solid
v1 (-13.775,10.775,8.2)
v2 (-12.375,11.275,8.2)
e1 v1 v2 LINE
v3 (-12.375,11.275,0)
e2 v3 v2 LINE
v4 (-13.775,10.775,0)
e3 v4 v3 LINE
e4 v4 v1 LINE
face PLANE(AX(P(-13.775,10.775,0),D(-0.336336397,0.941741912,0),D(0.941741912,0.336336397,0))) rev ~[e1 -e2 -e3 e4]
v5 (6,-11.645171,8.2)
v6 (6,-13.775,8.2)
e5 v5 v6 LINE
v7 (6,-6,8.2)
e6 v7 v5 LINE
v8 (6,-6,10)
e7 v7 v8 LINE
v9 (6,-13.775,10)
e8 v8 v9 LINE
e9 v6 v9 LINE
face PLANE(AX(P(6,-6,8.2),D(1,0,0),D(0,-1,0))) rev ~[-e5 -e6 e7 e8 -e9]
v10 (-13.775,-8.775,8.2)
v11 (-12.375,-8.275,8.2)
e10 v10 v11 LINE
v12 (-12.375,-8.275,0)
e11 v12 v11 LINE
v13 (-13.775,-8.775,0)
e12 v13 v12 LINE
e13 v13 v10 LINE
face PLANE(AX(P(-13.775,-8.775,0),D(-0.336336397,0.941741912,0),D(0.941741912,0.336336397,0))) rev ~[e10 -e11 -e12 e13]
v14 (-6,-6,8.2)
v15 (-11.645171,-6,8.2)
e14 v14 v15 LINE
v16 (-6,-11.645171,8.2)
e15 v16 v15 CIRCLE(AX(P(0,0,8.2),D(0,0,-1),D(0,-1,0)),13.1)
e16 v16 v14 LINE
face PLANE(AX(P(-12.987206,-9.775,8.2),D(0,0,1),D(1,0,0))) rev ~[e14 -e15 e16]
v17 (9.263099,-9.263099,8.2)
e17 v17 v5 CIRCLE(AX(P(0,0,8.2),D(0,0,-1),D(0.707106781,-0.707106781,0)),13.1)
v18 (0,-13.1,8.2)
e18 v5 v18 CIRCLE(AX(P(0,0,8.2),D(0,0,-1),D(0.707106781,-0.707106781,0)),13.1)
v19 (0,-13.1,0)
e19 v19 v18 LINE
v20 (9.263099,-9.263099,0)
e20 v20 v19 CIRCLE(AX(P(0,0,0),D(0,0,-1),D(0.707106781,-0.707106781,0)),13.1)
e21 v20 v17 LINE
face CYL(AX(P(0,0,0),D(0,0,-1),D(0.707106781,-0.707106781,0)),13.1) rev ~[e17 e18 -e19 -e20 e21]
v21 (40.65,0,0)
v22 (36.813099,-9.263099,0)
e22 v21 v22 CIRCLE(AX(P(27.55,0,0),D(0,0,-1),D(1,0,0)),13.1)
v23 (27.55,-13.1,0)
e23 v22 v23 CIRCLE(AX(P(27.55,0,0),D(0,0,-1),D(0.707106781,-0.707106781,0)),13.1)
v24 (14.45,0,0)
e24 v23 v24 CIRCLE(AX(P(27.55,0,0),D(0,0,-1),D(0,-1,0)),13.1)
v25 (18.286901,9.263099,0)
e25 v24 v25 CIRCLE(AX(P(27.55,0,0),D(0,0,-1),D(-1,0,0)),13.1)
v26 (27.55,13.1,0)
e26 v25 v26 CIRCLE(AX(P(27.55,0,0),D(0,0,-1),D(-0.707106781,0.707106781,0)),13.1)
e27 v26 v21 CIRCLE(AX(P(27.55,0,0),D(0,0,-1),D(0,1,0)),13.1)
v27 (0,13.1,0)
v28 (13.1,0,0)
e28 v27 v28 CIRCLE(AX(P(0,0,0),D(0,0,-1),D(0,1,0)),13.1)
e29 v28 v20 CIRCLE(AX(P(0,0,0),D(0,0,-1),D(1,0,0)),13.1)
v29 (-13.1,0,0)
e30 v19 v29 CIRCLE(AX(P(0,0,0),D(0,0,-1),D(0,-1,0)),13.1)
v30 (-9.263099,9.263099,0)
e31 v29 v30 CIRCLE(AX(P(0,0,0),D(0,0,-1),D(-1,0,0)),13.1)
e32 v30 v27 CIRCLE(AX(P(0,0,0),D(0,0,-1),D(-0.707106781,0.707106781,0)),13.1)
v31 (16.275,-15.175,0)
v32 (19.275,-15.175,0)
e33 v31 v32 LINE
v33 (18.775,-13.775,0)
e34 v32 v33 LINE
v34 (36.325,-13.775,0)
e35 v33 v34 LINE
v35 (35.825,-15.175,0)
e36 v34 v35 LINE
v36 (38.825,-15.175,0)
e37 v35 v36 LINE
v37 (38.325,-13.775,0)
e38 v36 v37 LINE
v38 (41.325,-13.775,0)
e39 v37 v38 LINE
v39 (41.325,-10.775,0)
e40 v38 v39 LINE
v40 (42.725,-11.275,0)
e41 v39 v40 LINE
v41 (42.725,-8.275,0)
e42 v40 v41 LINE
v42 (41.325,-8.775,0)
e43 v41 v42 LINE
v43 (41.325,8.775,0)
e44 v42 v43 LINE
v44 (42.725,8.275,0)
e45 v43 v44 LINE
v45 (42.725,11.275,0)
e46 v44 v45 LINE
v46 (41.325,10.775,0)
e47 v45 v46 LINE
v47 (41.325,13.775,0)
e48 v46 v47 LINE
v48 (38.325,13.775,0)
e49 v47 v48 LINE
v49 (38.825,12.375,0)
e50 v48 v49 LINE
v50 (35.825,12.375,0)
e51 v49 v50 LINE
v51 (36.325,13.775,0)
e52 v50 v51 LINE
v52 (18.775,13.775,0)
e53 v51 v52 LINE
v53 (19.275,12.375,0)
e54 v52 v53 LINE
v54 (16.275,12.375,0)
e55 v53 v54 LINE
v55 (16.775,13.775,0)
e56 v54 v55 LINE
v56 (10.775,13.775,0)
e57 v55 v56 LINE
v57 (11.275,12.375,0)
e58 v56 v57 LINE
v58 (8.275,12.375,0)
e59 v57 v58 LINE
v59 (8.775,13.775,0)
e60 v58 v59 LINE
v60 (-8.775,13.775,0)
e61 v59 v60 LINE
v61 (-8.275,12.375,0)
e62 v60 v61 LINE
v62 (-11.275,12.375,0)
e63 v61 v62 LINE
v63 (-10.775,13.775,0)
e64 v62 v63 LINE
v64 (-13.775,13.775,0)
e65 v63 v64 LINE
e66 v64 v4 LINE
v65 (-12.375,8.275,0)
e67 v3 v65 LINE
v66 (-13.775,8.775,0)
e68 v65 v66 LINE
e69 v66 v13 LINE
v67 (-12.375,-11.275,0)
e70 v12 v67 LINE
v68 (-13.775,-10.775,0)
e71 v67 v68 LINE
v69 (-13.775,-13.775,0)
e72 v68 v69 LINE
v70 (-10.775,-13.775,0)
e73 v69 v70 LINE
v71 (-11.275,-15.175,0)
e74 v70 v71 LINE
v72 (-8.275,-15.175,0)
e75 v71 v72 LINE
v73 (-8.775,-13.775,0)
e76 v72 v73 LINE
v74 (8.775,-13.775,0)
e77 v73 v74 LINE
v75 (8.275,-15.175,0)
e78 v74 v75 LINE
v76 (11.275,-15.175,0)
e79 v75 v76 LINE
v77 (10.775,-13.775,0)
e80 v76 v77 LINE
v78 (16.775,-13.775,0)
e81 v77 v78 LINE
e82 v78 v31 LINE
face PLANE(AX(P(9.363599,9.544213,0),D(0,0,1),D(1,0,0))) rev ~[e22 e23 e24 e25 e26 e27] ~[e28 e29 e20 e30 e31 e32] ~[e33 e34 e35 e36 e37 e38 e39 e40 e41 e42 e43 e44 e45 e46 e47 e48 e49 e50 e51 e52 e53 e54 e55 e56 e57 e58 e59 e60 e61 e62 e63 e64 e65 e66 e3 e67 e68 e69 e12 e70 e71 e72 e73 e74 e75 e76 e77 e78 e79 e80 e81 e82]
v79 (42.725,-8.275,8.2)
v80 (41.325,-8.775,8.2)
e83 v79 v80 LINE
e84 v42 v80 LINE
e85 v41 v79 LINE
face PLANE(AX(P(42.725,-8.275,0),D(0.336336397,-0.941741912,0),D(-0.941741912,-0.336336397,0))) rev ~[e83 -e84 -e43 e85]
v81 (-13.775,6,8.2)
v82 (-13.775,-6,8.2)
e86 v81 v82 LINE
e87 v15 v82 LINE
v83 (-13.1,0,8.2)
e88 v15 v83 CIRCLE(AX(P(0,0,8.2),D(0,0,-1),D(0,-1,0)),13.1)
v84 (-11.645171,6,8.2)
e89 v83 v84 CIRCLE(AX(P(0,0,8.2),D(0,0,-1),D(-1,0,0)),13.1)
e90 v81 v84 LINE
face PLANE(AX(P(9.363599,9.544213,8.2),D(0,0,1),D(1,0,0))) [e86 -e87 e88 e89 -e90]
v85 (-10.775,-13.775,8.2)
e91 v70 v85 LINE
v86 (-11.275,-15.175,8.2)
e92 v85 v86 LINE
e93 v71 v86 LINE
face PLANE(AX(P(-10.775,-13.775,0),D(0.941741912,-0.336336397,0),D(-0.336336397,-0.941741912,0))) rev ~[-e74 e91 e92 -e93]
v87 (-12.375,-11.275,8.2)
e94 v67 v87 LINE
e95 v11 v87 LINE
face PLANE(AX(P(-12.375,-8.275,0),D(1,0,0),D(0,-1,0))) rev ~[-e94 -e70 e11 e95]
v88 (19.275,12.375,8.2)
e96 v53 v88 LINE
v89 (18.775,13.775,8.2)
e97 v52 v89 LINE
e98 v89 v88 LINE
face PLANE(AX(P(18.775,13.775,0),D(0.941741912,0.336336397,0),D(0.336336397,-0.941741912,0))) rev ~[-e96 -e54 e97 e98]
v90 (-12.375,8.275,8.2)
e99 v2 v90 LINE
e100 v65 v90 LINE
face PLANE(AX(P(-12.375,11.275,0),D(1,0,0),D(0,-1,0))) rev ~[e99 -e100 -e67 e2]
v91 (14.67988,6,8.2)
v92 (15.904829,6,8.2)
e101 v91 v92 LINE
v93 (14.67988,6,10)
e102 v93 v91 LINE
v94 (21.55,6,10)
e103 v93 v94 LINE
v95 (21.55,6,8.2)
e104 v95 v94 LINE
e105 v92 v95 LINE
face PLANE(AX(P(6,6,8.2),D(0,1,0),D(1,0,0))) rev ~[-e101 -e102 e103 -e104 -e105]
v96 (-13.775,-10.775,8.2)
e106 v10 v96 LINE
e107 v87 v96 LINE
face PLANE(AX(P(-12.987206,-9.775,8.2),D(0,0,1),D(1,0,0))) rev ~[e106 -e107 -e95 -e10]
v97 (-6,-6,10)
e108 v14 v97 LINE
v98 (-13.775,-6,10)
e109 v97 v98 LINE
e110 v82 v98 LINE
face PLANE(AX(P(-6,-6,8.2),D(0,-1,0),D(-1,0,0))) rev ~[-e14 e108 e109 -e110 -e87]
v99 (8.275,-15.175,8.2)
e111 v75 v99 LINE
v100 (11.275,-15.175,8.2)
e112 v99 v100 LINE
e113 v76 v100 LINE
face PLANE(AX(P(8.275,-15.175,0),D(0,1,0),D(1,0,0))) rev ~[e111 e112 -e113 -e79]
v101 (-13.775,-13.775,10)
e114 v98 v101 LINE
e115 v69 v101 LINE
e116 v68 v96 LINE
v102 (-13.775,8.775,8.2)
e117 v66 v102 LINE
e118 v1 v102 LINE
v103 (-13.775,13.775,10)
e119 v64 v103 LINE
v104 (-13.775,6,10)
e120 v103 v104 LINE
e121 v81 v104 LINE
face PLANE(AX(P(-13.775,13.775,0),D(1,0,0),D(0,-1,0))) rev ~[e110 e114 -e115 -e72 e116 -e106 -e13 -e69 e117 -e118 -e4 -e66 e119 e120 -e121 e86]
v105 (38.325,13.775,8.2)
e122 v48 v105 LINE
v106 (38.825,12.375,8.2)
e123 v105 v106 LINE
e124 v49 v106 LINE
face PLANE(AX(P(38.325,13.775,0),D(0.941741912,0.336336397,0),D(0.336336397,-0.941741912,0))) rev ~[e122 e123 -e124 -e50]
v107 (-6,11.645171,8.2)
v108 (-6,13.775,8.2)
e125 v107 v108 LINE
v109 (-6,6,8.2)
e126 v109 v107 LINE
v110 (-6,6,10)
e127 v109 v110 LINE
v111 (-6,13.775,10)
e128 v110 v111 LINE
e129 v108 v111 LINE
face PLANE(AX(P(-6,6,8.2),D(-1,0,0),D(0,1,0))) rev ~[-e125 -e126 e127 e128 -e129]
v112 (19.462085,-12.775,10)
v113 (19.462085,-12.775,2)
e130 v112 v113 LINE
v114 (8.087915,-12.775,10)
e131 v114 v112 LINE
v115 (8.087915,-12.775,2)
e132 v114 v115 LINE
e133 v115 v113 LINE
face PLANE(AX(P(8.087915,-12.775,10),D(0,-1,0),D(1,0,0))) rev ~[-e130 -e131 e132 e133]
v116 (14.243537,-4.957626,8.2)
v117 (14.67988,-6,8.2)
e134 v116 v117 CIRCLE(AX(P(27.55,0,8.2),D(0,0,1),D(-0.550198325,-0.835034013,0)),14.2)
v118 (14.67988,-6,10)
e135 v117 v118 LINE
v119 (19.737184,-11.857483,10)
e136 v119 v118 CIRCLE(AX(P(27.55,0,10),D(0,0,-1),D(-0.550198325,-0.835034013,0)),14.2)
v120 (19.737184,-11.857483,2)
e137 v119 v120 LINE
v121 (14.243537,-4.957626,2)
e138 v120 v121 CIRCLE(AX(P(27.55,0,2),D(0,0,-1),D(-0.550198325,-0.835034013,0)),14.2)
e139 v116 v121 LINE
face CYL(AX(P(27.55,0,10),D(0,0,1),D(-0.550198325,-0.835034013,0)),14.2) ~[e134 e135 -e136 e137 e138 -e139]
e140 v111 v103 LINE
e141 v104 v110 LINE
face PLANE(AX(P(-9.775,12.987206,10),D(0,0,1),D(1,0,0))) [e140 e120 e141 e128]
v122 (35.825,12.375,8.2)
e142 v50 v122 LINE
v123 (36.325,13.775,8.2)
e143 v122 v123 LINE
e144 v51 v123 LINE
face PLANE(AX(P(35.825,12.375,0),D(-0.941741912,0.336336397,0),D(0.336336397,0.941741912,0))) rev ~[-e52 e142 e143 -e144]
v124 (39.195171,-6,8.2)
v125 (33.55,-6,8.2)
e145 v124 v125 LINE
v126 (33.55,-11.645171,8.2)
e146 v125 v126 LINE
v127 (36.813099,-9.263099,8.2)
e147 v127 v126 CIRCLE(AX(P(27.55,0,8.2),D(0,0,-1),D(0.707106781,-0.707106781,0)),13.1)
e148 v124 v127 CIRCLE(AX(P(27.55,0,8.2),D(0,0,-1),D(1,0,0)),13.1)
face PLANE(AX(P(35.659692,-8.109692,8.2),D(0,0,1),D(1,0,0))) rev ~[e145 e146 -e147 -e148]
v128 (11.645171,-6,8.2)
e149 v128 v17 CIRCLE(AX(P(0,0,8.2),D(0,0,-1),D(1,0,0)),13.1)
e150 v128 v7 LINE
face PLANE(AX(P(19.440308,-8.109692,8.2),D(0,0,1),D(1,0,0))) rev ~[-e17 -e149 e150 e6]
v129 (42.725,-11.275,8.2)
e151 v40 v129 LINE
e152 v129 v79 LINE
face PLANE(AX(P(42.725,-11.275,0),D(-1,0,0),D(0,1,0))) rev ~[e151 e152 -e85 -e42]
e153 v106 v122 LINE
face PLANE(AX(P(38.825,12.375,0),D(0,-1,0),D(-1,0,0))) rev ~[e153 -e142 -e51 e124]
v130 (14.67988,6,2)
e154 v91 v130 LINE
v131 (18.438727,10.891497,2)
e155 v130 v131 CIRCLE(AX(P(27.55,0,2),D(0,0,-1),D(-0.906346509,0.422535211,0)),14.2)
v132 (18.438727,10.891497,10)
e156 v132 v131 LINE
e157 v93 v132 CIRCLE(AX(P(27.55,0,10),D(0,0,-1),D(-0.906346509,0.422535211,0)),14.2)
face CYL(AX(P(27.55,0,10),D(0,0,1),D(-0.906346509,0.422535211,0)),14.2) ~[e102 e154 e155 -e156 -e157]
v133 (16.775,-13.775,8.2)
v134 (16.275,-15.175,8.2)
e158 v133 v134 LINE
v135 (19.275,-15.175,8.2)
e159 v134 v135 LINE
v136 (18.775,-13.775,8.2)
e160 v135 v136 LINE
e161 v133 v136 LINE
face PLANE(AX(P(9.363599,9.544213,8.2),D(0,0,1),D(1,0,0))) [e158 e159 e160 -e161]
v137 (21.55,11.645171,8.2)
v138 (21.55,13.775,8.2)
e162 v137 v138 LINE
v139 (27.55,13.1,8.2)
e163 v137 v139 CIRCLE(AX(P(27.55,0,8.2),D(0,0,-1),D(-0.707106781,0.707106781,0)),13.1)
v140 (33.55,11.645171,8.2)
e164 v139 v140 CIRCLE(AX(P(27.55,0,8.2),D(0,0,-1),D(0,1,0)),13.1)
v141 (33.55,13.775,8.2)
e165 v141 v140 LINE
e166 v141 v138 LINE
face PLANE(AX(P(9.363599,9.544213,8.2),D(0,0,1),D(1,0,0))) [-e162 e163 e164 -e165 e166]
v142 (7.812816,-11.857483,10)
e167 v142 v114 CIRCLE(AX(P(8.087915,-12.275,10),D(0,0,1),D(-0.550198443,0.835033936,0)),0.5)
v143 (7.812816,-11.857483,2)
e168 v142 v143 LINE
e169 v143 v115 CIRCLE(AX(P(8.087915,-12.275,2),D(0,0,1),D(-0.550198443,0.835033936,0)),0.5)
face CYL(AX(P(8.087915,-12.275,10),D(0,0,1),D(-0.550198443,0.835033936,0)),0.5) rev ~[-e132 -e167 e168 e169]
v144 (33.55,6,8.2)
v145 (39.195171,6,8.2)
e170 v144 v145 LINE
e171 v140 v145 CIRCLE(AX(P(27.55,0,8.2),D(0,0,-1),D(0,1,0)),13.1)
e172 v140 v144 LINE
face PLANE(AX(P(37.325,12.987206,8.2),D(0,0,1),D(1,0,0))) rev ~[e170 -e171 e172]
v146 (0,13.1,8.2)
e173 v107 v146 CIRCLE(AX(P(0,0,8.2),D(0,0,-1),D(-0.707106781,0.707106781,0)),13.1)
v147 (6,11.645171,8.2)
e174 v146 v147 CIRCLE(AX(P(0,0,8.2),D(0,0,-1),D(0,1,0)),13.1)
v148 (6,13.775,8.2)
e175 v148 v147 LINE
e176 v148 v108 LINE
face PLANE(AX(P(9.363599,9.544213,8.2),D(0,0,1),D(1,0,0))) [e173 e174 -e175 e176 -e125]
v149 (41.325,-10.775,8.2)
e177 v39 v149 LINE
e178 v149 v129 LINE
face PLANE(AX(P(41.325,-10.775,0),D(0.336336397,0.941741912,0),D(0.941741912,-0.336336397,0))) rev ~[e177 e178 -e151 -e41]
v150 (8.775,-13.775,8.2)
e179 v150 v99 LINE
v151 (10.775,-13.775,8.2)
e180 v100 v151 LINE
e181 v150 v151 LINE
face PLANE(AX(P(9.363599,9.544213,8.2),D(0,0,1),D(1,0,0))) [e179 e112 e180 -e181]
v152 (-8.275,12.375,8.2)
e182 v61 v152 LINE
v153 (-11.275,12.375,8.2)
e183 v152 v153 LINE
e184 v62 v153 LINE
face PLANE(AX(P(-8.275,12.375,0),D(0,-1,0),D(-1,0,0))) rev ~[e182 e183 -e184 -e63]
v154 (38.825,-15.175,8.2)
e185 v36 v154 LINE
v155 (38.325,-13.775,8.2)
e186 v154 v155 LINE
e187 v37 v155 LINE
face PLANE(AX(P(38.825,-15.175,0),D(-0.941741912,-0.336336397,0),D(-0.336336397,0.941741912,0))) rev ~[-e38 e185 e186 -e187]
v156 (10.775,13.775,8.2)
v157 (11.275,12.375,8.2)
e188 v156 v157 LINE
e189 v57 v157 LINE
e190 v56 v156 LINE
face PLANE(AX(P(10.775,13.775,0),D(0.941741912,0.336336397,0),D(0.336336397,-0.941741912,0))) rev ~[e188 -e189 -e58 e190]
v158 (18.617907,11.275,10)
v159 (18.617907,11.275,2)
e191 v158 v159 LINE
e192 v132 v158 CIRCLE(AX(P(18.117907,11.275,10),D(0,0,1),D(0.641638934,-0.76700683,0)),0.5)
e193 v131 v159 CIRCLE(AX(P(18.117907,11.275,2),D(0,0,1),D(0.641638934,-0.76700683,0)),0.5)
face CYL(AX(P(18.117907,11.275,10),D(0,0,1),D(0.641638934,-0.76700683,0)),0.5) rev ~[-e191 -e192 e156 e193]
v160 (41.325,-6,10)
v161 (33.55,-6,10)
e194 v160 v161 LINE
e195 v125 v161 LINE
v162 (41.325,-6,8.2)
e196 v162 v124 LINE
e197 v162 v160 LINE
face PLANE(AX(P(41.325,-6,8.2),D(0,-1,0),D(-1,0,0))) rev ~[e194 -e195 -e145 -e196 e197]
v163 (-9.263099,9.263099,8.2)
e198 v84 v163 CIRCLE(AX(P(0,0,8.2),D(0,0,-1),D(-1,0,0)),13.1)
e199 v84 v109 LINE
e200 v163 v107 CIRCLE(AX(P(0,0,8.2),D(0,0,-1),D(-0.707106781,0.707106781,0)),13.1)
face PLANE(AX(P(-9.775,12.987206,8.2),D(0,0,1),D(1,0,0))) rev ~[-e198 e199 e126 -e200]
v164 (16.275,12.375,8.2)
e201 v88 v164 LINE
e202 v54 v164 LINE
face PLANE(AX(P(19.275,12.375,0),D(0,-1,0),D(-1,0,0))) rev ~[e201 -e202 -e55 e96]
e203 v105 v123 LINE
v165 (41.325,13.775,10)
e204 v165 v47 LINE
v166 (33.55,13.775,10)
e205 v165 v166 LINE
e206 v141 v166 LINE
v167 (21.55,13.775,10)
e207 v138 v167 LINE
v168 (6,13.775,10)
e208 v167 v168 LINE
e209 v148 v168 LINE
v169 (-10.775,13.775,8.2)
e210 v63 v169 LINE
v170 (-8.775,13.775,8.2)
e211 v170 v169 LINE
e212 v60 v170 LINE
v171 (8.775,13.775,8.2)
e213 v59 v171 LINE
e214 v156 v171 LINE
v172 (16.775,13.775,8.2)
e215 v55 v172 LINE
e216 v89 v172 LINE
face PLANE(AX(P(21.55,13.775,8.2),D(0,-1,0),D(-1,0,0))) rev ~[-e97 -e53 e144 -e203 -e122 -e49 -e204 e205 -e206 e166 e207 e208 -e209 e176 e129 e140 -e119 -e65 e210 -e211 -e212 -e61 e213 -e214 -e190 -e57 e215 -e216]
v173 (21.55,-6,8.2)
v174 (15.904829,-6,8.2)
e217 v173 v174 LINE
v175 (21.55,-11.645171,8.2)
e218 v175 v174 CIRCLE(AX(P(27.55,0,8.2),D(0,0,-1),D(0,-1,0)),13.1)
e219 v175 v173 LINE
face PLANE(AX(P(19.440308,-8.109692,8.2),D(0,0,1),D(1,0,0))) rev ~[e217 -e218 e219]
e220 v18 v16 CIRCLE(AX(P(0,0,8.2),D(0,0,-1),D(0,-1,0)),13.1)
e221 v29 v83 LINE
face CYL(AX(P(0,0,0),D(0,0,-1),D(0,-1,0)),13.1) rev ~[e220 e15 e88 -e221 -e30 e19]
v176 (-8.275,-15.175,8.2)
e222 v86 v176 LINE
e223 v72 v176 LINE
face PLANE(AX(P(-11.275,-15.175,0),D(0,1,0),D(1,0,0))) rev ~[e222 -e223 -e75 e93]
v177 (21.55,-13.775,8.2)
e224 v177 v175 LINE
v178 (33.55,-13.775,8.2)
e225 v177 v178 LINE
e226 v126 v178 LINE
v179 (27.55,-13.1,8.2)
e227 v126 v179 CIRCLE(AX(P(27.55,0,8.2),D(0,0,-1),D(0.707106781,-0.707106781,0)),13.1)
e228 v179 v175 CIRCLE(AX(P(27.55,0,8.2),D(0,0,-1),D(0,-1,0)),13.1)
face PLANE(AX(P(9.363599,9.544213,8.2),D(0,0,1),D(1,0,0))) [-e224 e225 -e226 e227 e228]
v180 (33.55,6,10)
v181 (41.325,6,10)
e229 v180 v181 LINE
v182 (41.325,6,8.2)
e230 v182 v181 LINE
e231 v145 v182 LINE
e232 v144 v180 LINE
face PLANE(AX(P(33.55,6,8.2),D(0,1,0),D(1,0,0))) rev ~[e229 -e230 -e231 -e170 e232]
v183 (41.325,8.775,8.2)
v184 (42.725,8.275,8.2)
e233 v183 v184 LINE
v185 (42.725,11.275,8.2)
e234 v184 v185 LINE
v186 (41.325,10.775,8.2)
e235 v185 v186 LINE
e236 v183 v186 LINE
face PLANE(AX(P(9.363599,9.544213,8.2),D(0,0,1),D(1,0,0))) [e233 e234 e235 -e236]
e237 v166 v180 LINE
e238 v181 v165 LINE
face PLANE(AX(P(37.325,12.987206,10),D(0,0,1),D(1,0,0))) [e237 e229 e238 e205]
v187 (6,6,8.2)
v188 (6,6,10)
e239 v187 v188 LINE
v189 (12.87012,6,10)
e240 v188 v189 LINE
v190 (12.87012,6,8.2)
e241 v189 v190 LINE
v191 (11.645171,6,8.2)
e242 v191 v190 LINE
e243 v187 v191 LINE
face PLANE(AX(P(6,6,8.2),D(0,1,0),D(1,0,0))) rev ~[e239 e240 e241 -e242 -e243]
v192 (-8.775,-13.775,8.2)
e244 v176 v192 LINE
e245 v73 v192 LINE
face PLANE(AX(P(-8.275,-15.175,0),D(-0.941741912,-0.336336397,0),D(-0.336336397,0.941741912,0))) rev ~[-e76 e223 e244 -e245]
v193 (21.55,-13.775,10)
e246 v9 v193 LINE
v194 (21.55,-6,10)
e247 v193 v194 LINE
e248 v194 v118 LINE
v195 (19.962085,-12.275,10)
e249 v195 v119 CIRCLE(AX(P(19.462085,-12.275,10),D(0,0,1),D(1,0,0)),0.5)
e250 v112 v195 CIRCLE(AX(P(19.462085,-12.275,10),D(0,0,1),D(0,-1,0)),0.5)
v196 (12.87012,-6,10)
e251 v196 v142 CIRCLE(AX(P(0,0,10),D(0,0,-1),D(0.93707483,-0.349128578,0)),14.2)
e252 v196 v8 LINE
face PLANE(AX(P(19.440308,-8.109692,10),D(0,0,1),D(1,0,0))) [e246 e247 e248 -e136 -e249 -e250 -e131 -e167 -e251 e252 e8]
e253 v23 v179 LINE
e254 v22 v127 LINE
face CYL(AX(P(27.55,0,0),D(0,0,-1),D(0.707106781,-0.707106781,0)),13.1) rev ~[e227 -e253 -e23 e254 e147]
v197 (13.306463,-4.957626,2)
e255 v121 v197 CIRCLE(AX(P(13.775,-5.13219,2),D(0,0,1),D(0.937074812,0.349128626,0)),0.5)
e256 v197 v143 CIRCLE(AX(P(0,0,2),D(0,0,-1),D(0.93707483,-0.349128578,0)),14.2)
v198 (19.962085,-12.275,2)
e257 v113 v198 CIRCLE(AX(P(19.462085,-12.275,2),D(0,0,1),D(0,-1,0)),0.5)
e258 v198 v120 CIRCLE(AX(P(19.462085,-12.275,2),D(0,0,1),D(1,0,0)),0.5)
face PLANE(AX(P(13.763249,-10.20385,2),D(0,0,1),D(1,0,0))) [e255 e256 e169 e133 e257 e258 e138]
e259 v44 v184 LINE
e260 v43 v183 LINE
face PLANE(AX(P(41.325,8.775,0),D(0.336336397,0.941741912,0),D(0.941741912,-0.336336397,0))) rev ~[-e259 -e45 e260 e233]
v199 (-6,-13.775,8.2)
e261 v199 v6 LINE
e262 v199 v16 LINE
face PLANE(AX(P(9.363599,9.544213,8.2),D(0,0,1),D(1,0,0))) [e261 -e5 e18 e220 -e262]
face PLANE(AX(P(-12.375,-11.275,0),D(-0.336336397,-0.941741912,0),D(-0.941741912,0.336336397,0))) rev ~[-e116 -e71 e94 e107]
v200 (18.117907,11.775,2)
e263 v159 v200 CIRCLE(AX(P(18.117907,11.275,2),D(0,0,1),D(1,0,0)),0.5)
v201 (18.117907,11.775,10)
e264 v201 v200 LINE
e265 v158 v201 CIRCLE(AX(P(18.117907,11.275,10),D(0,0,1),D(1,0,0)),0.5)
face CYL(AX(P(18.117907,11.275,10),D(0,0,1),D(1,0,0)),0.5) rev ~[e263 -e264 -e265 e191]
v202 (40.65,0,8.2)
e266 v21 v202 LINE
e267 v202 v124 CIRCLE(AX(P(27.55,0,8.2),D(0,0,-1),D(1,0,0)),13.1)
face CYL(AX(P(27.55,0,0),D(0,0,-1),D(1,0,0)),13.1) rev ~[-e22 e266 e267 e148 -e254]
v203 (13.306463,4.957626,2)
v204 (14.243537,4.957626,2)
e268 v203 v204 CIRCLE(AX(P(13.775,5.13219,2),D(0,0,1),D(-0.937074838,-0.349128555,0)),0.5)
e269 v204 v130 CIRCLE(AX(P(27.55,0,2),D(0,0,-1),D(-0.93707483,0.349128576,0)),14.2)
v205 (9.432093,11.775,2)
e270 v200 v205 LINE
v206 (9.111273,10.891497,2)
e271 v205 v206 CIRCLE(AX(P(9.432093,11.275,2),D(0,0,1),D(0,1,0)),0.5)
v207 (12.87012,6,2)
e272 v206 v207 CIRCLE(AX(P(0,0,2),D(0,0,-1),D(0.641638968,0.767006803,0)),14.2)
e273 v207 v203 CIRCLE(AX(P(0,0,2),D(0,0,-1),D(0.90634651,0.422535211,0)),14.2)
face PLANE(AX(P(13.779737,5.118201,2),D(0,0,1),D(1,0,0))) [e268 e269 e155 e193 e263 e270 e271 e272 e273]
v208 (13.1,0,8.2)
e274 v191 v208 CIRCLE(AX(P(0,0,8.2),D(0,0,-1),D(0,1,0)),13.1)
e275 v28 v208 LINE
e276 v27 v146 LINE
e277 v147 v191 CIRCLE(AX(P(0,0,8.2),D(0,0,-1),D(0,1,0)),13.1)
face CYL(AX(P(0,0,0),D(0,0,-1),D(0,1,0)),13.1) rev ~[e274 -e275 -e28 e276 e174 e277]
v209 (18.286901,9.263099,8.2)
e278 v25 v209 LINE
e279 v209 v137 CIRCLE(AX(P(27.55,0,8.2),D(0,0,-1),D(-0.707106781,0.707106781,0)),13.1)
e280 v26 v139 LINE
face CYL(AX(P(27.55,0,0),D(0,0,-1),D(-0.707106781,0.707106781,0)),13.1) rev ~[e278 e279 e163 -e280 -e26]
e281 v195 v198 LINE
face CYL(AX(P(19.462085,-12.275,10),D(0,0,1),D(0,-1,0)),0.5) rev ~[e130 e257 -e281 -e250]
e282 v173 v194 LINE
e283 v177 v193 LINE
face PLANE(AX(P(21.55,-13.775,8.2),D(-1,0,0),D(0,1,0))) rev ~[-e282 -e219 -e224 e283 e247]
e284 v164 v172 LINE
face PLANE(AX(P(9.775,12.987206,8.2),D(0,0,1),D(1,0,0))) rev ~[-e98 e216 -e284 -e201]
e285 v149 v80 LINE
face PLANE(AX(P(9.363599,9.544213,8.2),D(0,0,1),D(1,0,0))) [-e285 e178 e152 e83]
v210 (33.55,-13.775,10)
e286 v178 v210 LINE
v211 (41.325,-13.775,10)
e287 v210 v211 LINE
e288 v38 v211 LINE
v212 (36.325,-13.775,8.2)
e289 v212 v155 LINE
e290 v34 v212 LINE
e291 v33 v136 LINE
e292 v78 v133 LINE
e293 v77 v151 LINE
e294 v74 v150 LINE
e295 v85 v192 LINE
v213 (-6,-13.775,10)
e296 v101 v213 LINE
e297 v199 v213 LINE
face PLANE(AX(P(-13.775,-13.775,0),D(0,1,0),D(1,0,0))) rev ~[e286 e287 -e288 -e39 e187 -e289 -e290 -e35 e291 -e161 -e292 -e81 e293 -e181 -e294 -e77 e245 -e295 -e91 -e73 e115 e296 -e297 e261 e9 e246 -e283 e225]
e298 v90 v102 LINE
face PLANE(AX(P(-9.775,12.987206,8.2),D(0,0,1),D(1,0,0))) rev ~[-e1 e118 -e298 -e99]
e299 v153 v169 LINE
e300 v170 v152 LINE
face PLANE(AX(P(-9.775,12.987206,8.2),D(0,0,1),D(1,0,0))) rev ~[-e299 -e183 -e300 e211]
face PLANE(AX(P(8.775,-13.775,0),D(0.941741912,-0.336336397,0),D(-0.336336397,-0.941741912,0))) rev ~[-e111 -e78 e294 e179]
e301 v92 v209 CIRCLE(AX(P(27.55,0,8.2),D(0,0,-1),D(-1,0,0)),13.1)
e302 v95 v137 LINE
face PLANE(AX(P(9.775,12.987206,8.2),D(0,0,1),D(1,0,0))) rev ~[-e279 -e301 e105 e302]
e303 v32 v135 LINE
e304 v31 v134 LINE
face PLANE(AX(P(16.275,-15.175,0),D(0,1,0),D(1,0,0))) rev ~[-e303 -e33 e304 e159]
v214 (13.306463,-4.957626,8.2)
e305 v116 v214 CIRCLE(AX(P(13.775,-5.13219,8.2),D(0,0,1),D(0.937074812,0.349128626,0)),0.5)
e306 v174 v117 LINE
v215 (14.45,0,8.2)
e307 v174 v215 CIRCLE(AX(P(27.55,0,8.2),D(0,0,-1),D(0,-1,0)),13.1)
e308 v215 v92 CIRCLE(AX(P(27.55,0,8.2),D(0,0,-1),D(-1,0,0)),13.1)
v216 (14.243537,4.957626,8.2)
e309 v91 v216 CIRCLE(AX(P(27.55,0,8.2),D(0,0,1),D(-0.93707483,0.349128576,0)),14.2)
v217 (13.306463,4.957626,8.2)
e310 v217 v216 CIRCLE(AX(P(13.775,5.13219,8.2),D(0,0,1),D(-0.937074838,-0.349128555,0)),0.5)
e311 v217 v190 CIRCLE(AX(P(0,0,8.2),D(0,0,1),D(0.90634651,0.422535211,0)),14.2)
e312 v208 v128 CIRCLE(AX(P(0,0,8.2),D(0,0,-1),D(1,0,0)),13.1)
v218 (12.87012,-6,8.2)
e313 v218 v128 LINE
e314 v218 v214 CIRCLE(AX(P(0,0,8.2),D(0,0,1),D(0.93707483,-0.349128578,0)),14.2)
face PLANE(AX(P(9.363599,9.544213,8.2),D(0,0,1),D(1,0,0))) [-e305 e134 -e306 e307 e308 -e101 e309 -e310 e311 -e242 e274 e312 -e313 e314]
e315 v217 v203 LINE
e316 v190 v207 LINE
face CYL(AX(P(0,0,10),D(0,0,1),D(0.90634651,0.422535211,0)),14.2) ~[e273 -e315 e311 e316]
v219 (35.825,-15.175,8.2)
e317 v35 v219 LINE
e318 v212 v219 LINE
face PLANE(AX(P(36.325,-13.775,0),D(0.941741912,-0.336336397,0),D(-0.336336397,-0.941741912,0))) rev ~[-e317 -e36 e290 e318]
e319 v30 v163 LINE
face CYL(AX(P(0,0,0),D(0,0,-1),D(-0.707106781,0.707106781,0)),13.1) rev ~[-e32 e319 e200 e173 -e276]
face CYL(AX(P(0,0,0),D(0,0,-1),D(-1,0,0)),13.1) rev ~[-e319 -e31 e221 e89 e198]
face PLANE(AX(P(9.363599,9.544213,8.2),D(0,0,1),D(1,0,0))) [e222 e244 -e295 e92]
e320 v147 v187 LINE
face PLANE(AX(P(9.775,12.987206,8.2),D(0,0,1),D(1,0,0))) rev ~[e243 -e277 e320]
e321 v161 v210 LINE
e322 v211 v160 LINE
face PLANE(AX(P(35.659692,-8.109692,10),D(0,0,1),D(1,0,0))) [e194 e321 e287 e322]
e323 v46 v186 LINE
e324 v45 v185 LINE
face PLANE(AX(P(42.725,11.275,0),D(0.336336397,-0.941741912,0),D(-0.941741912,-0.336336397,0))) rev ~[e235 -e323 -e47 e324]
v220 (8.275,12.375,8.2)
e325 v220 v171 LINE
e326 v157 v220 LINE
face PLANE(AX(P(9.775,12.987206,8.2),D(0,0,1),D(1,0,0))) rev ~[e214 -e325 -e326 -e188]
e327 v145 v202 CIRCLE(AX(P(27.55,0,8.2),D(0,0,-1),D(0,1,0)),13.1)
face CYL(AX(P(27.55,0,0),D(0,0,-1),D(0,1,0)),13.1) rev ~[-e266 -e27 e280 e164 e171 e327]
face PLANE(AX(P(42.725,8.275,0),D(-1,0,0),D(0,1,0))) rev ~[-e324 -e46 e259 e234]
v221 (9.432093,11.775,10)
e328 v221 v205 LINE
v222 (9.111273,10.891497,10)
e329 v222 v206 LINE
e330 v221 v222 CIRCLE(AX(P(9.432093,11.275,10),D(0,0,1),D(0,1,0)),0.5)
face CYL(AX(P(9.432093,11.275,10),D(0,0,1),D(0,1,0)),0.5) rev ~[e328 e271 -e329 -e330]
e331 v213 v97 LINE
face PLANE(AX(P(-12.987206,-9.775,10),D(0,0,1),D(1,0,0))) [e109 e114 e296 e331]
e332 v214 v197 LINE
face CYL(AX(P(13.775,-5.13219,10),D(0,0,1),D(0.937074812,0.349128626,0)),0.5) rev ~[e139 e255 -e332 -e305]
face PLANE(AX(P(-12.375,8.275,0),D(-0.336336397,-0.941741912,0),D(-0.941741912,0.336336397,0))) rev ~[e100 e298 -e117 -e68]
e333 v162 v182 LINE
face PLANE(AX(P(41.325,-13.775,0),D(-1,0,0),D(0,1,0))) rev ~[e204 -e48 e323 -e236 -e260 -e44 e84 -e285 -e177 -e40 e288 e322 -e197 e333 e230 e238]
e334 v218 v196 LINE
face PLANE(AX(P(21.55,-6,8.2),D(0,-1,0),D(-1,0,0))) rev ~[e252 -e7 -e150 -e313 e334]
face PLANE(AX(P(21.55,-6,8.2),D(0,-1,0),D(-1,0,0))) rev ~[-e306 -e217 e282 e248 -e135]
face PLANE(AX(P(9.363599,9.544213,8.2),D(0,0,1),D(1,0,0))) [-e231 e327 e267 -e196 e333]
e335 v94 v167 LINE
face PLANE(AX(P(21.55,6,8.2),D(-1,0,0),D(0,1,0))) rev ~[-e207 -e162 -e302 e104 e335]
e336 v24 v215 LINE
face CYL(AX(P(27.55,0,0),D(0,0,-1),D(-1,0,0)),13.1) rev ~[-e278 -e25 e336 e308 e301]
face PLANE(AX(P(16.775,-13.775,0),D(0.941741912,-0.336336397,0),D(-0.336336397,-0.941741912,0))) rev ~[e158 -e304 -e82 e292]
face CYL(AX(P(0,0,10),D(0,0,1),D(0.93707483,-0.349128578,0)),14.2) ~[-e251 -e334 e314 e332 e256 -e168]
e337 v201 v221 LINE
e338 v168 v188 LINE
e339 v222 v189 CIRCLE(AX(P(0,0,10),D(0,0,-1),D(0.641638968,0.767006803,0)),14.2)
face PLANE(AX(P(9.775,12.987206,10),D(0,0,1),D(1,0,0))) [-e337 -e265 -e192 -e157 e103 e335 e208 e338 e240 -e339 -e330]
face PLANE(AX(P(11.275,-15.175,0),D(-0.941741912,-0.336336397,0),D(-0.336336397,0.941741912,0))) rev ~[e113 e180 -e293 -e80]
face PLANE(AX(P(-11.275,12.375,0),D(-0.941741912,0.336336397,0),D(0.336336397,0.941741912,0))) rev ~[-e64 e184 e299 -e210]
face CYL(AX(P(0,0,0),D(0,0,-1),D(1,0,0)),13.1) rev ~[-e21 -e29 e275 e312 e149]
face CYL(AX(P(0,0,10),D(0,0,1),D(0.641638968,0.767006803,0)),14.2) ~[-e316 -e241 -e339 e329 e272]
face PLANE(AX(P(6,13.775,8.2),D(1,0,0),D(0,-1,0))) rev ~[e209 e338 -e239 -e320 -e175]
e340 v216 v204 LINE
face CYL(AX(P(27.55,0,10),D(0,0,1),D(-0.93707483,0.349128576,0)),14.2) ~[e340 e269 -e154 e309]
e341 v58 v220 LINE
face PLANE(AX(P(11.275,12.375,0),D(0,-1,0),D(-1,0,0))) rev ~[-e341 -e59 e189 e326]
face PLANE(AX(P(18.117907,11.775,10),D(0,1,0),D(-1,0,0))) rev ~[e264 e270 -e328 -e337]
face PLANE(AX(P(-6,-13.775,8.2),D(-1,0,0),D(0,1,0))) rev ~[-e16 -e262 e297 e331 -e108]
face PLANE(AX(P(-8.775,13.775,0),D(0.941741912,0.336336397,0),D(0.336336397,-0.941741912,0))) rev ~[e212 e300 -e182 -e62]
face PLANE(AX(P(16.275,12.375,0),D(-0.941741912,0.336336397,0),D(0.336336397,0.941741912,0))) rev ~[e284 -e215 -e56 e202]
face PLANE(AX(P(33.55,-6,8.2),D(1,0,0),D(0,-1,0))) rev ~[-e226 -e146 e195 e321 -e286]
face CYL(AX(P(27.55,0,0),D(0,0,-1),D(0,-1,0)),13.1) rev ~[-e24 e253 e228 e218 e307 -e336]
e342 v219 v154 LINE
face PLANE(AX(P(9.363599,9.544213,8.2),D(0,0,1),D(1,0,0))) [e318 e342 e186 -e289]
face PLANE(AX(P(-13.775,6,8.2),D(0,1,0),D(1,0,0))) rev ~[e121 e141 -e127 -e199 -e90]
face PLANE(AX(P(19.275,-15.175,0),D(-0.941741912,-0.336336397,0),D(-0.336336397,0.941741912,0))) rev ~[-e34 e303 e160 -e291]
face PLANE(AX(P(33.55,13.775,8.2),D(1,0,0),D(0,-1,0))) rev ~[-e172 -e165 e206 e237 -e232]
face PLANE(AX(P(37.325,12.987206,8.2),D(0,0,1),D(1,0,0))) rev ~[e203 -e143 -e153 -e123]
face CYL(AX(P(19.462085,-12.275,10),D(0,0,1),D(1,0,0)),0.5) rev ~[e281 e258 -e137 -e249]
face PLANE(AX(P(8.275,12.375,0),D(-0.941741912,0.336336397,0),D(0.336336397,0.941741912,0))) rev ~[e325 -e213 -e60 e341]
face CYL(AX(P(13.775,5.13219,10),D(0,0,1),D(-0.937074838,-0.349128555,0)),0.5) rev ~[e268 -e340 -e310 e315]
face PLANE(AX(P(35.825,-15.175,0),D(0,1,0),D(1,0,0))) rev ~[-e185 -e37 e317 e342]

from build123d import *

# Parameters (mm, degrees)
F1_DEPTH = 8.2
F3_DEPTH = 1.8
F5_DEPTH = 8


# Not quite as in the source:
# - a feature names something its author has since deleted; it is built from what else it names


with BuildPart() as f1:
    # F0 (on Top) → F1 (new body)
    with BuildSketch(Plane.XY):
        with BuildLine():
            Line((13.775, 10.775), (13.775, 13.775))
            Line((13.775, 13.775), (10.775, 13.775))
            Line((10.775, 13.775), (11.275, 12.375))
            Line((11.275, 12.375), (8.275, 12.375))
            Line((8.275, 12.375), (8.775, 13.775))
            Line((8.775, 13.775), (0, 13.775))
            Line((0, 13.775), (0, 13.1))
            ThreePointArc((0, 13.1), (9.2630988335, 9.2630988335), (13.1, 0))
            Line((13.1, 0), (13.775, 0))
            Line((13.775, 0), (13.775, 8.775))
            Line((13.775, 8.775), (13.775, 10.775))
        make_face()
        Polygon((15.175, 11.275), (13.775, 10.775), (13.775, 8.775), (15.175, 8.275), align=None)
        Polygon((15.175, -8.275), (13.775, -8.775), (13.775, -10.775), (15.175, -11.275), align=None)
        with BuildLine():
            Line((13.775, -8.775), (13.775, 0))
            Line((13.775, 0), (13.1, 0))
            ThreePointArc((13.1, 0), (12.1028218759, -5.013152964), (9.2630988335, -9.2630988335))
            Line((9.2630988335, -9.2630988335), (13.775, -13.775))
            Line((13.775, -13.775), (13.775, -10.775))
            Line((13.775, -10.775), (13.775, -8.775))
        make_face()
        with BuildLine():
            Line((13.775, -13.775), (9.2630988335, -9.2630988335))
            ThreePointArc((9.2630988335, -9.2630988335), (5.013152964, -12.1028218759), (0, -13.1))
            Line((0, -13.1), (0, -13.775))
            Line((0, -13.775), (8.775, -13.775))
            Line((8.775, -13.775), (10.775, -13.775))
            Line((10.775, -13.775), (13.775, -13.775))
        make_face()
        Polygon((11.275, -15.175), (10.775, -13.775), (8.775, -13.775), (8.275, -15.175), align=None)
        with BuildLine():
            ThreePointArc((0, -13.1), (-9.2630988335, -9.2630988335), (-13.1, 0))
            Line((-13.1, 0), (-13.775, 0))
            Line((-13.775, 0), (-13.775, -8.775))
            Line((-13.775, -8.775), (-12.375, -8.275))
            Line((-12.375, -8.275), (-12.375, -11.275))
            Line((-12.375, -11.275), (-13.775, -10.775))
            Line((-13.775, -10.775), (-13.775, -13.775))
            Line((-13.775, -13.775), (-10.775, -13.775))
            Line((-10.775, -13.775), (-8.775, -13.775))
            Line((-8.775, -13.775), (0, -13.775))
            Line((0, -13.775), (0, -13.1))
        make_face()
        Polygon((-8.275, -15.175), (-8.775, -13.775), (-10.775, -13.775), (-11.275, -15.175), align=None)
        with BuildLine():
            ThreePointArc((-13.1, 0), (-12.1028218759, 5.013152964), (-9.2630988335, 9.2630988335))
            Line((-9.2630988335, 9.2630988335), (-13.775, 13.775))
            Line((-13.775, 13.775), (-13.775, 10.775))
            Line((-13.775, 10.775), (-12.375, 11.275))
            Line((-12.375, 11.275), (-12.375, 8.275))
            Line((-12.375, 8.275), (-13.775, 8.775))
            Line((-13.775, 8.775), (-13.775, 0))
            Line((-13.775, 0), (-13.1, 0))
        make_face()
        with BuildLine():
            Line((0, 13.1), (0, 13.775))
            Line((0, 13.775), (-8.775, 13.775))
            Line((-8.775, 13.775), (-8.275, 12.375))
            Line((-8.275, 12.375), (-9.775, 12.375))
            Line((-9.775, 12.375), (-11.275, 12.375))
            Line((-11.275, 12.375), (-10.775, 13.775))
            Line((-10.775, 13.775), (-13.775, 13.775))
            Line((-13.775, 13.775), (-9.2630988335, 9.2630988335))
            ThreePointArc((-9.2630988335, 9.2630988335), (-5.013152964, 12.1028218759), (0, 13.1))
        make_face()
        with BuildLine():
            ThreePointArc((27.55, -13.1), (18.2869011665, -9.2630988335), (14.45, 0))
            Line((14.45, 0), (13.775, 0))
            Line((13.775, 0), (13.775, -8.775))
            Line((13.775, -8.775), (15.175, -8.275))
            Line((15.175, -8.275), (15.175, -11.275))
            Line((15.175, -11.275), (13.775, -10.775))
            Line((13.775, -10.775), (13.775, -13.775))
            Line((13.775, -13.775), (16.775, -13.775))
            Line((16.775, -13.775), (18.775, -13.775))
            Line((18.775, -13.775), (27.55, -13.775))
            Line((27.55, -13.775), (27.55, -13.1))
        make_face()
        with BuildLine():
            Line((18.2869011665, 9.2630988335), (13.775, 13.775))
            Line((13.775, 13.775), (13.775, 10.775))
            Line((13.775, 10.775), (15.175, 11.275))
            Line((15.175, 11.275), (15.175, 8.275))
            Line((15.175, 8.275), (13.775, 8.775))
            Line((13.775, 8.775), (13.775, 0))
            Line((13.775, 0), (14.45, 0))
            ThreePointArc((14.45, 0), (15.4471781241, 5.013152964), (18.2869011665, 9.2630988335))
        make_face()
        with BuildLine():
            Line((16.775, 13.775), (13.775, 13.775))
            Line((13.775, 13.775), (18.2869011665, 9.2630988335))
            ThreePointArc((18.2869011665, 9.2630988335), (22.536847036, 12.1028218759), (27.55, 13.1))
            Line((27.55, 13.1), (27.55, 13.775))
            Line((27.55, 13.775), (18.775, 13.775))
            Line((18.775, 13.775), (19.275, 12.375))
            Line((19.275, 12.375), (17.775, 12.375))
            Line((17.775, 12.375), (16.275, 12.375))
            Line((16.275, 12.375), (16.775, 13.775))
        make_face()
        with BuildLine():
            Line((27.55, 13.775), (27.55, 13.1))
            ThreePointArc((27.55, 13.1), (36.8130988335, 9.2630988335), (40.65, 0))
            Line((40.65, 0), (41.325, 0))
            Line((41.325, 0), (41.325, 8.775))
            Line((41.325, 8.775), (41.325, 10.775))
            Line((41.325, 10.775), (41.325, 13.775))
            Line((41.325, 13.775), (38.325, 13.775))
            Line((38.325, 13.775), (38.825, 12.375))
            Line((38.825, 12.375), (35.825, 12.375))
            Line((35.825, 12.375), (36.325, 13.775))
            Line((36.325, 13.775), (27.55, 13.775))
        make_face()
        Polygon((41.325, 10.775), (41.325, 8.775), (42.725, 8.275), (42.725, 11.275), align=None)
        Polygon((19.275, -15.175), (18.775, -13.775), (16.775, -13.775), (16.275, -15.175), align=None)
        Polygon((38.325, -13.775), (36.325, -13.775), (35.825, -15.175), (38.825, -15.175), align=None)
        Polygon((42.725, -8.275), (41.325, -8.775), (41.325, -10.775), (42.725, -11.275), align=None)
        with BuildLine():
            Line((41.325, 0), (40.65, 0))
            ThreePointArc((40.65, 0), (39.6528218759, -5.013152964), (36.8130988335, -9.2630988335))
            Line((36.8130988335, -9.2630988335), (41.325, -13.775))
            Line((41.325, -13.775), (41.325, -10.775))
            Line((41.325, -10.775), (41.325, -8.775))
            Line((41.325, -8.775), (41.325, 0))
        make_face()
        with BuildLine():
            ThreePointArc((36.8130988335, -9.2630988335), (32.563152964, -12.1028218759), (27.55, -13.1))
            Line((27.55, -13.1), (27.55, -13.775))
            Line((27.55, -13.775), (36.325, -13.775))
            Line((36.325, -13.775), (38.325, -13.775))
            Line((38.325, -13.775), (41.325, -13.775))
            Line((41.325, -13.775), (36.8130988335, -9.2630988335))
        make_face()
    extrude(amount=F1_DEPTH)

    # F2 (on face) → F3 (join)
    with BuildSketch(Plane.XY.offset(8.2)):
        Polygon((11.275, 12.375), (10.775, 13.775), (8.775, 13.775), (8.275, 12.375), align=None)
        Polygon((-8.775, 13.775), (-10.775, 13.775), (-11.275, 12.375), (-8.275, 12.375), align=None)
        Polygon((-12.375, 11.275), (-13.775, 10.775), (-13.775, 8.775), (-12.375, 8.275), align=None)
        Polygon((-13.775, -8.775), (-13.775, -10.775), (-12.375, -11.275), (-12.375, -8.275), align=None)
        Polygon((18.775, 13.775), (16.775, 13.775), (16.275, 12.375), (19.275, 12.375), align=None)
        Polygon((38.325, 13.775), (36.325, 13.775), (35.825, 12.375), (38.825, 12.375), align=None)
        with BuildLine():
            ThreePointArc((21.55, 11.6451706729), (18.2869011665, 9.2630988335), (15.9048293271, 6))
            Line((15.9048293271, 6), (21.55, 6))
            Line((21.55, 6), (21.55, 11.6451706729))
        make_face()
        with BuildLine():
            ThreePointArc((39.1951706729, 6), (36.8130988335, 9.2630988335), (33.55, 11.6451706729))
            Line((33.55, 11.6451706729), (33.55, 6))
            Line((33.55, 6), (39.1951706729, 6))
        make_face()
        with BuildLine():
            Line((33.55, -6), (33.55, -11.6451706729))
            ThreePointArc((33.55, -11.6451706729), (36.8130988335, -9.2630988335), (39.1951706729, -6))
            Line((39.1951706729, -6), (33.55, -6))
        make_face()
        with BuildLine():
            Line((21.55, -6), (15.9048293271, -6))
            ThreePointArc((15.9048293271, -6), (18.2869011665, -9.2630988335), (21.55, -11.6451706729))
            Line((21.55, -11.6451706729), (21.55, -6))
        make_face()
        with BuildLine():
            Line((-9.2630988335, 9.2630988335), (-6, 6))
            Line((-6, 6), (-6, 11.6451706729))
            ThreePointArc((-6, 11.6451706729), (-7.7239311922, 10.5806846157), (-9.2630988335, 9.2630988335))
        make_face()
        with BuildLine():
            Line((-11.6451706729, 6), (-6, 6))
            Line((-6, 6), (-9.2630988335, 9.2630988335))
            ThreePointArc((-9.2630988335, 9.2630988335), (-10.5806846157, 7.7239311922), (-11.6451706729, 6))
        make_face()
        with BuildLine():
            Line((11.6451706729, -6), (6, -6))
            Line((6, -6), (9.2630988335, -9.2630988335))
            ThreePointArc((9.2630988335, -9.2630988335), (10.5806846157, -7.7239311922), (11.6451706729, -6))
        make_face()
        with BuildLine():
            Line((9.2630988335, -9.2630988335), (6, -6))
            Line((6, -6), (6, -11.6451706729))
            ThreePointArc((6, -11.6451706729), (7.7239311922, -10.5806846157), (9.2630988335, -9.2630988335))
        make_face()
        with BuildLine():
            Line((6, 11.6451706729), (6, 6))
            Line((6, 6), (9.2630988335, 9.2630988335))
            ThreePointArc((9.2630988335, 9.2630988335), (7.7239311922, 10.5806846157), (6, 11.6451706729))
        make_face()
        with BuildLine():
            Line((9.2630988335, 9.2630988335), (6, 6))
            Line((6, 6), (11.6451706729, 6))
            ThreePointArc((11.6451706729, 6), (10.5806846157, 7.7239311922), (9.2630988335, 9.2630988335))
        make_face()
        with BuildLine():
            Line((-9.2630988335, -9.2630988335), (-6, -6))
            Line((-6, -6), (-11.6451706729, -6))
            ThreePointArc((-11.6451706729, -6), (-10.5806846157, -7.7239311922), (-9.2630988335, -9.2630988335))
        make_face()
        with BuildLine():
            Line((-6, -11.6451706729), (-6, -6))
            Line((-6, -6), (-9.2630988335, -9.2630988335))
            ThreePointArc((-9.2630988335, -9.2630988335), (-7.7239311922, -10.5806846157), (-6, -11.6451706729))
        make_face()
        with BuildLine():
            Line((13.775, -13.775), (9.2630988335, -9.2630988335))
            ThreePointArc((9.2630988335, -9.2630988335), (7.7239311922, -10.5806846157), (6, -11.6451706729))
            Line((6, -11.6451706729), (6, -13.775))
            Line((6, -13.775), (8.775, -13.775))
            Line((8.775, -13.775), (10.775, -13.775))
            Line((10.775, -13.775), (13.775, -13.775))
        make_face()
        with BuildLine():
            ThreePointArc((11.6451706729, -6), (10.5806846157, -7.7239311922), (9.2630988335, -9.2630988335))
            Line((9.2630988335, -9.2630988335), (13.775, -13.775))
            Line((13.775, -13.775), (13.775, -6))
            Line((13.775, -6), (11.6451706729, -6))
        make_face()
        with BuildLine():
            ThreePointArc((-11.6451706729, 6), (-10.5806846157, 7.7239311922), (-9.2630988335, 9.2630988335))
            Line((-9.2630988335, 9.2630988335), (-13.775, 13.775))
            Line((-13.775, 13.775), (-13.775, 10.775))
            Line((-13.775, 10.775), (-12.375, 11.275))
            Line((-12.375, 11.275), (-12.375, 8.275))
            Line((-12.375, 8.275), (-13.775, 8.775))
            Line((-13.775, 8.775), (-13.775, 6))
            Line((-13.775, 6), (-11.6451706729, 6))
        make_face()
        with BuildLine():
            Line((-13.775, 13.775), (-9.2630988335, 9.2630988335))
            ThreePointArc((-9.2630988335, 9.2630988335), (-7.7239311922, 10.5806846157), (-6, 11.6451706729))
            Line((-6, 11.6451706729), (-6, 13.775))
            Line((-6, 13.775), (-8.775, 13.775))
            Line((-8.775, 13.775), (-8.275, 12.375))
            Line((-8.275, 12.375), (-11.275, 12.375))
            Line((-11.275, 12.375), (-10.775, 13.775))
            Line((-10.775, 13.775), (-13.775, 13.775))
        make_face()
        with BuildLine():
            ThreePointArc((6, 11.6451706729), (7.7239311922, 10.5806846157), (9.2630988335, 9.2630988335))
            Line((9.2630988335, 9.2630988335), (13.775, 13.775))
            Line((13.775, 13.775), (10.775, 13.775))
            Line((10.775, 13.775), (11.275, 12.375))
            Line((11.275, 12.375), (8.275, 12.375))
            Line((8.275, 12.375), (8.775, 13.775))
            Line((8.775, 13.775), (6, 13.775))
            Line((6, 13.775), (6, 11.6451706729))
        make_face()
        with BuildLine():
            Line((13.775, 13.775), (9.2630988335, 9.2630988335))
            ThreePointArc((9.2630988335, 9.2630988335), (10.5806846157, 7.7239311922), (11.6451706729, 6))
            Line((11.6451706729, 6), (13.775, 6))
            Line((13.775, 6), (13.775, 13.775))
        make_face()
        with BuildLine():
            Line((-13.775, -13.775), (-9.2630988335, -9.2630988335))
            ThreePointArc((-9.2630988335, -9.2630988335), (-10.5806846157, -7.7239311922), (-11.6451706729, -6))
            Line((-11.6451706729, -6), (-13.775, -6))
            Line((-13.775, -6), (-13.775, -8.775))
            Line((-13.775, -8.775), (-12.375, -8.275))
            Line((-12.375, -8.275), (-12.375, -11.275))
            Line((-12.375, -11.275), (-13.775, -10.775))
            Line((-13.775, -10.775), (-13.775, -13.775))
        make_face()
        with BuildLine():
            ThreePointArc((-6, -11.6451706729), (-7.7239311922, -10.5806846157), (-9.2630988335, -9.2630988335))
            Line((-9.2630988335, -9.2630988335), (-13.775, -13.775))
            Line((-13.775, -13.775), (-10.775, -13.775))
            Line((-10.775, -13.775), (-8.775, -13.775))
            Line((-8.775, -13.775), (-6, -13.775))
            Line((-6, -13.775), (-6, -11.6451706729))
        make_face()
        with BuildLine():
            Line((16.775, 13.775), (13.775, 13.775))
            Line((13.775, 13.775), (13.775, 6))
            Line((13.775, 6), (15.9048293271, 6))
            ThreePointArc((15.9048293271, 6), (18.2869011665, 9.2630988335), (21.55, 11.6451706729))
            Line((21.55, 11.6451706729), (21.55, 13.775))
            Line((21.55, 13.775), (18.775, 13.775))
            Line((18.775, 13.775), (19.275, 12.375))
            Line((19.275, 12.375), (16.275, 12.375))
            Line((16.275, 12.375), (16.775, 13.775))
        make_face()
        with BuildLine():
            Line((33.55, 13.775), (33.55, 11.6451706729))
            ThreePointArc((33.55, 11.6451706729), (36.8130988335, 9.2630988335), (39.1951706729, 6))
            Line((39.1951706729, 6), (41.325, 6))
            Line((41.325, 6), (41.325, 8.775))
            Line((41.325, 8.775), (41.325, 10.775))
            Line((41.325, 10.775), (41.325, 13.775))
            Line((41.325, 13.775), (38.325, 13.775))
            Line((38.325, 13.775), (38.825, 12.375))
            Line((38.825, 12.375), (35.825, 12.375))
            Line((35.825, 12.375), (36.325, 13.775))
            Line((36.325, 13.775), (33.55, 13.775))
        make_face()
        with BuildLine():
            ThreePointArc((39.1951706729, -6), (36.8130988335, -9.2630988335), (33.55, -11.6451706729))
            Line((33.55, -11.6451706729), (33.55, -13.775))
            Line((33.55, -13.775), (36.325, -13.775))
            Line((36.325, -13.775), (38.325, -13.775))
            Line((38.325, -13.775), (41.325, -13.775))
            Line((41.325, -13.775), (41.325, -10.775))
            Line((41.325, -10.775), (41.325, -8.775))
            Line((41.325, -8.775), (41.325, -6))
            Line((41.325, -6), (39.1951706729, -6))
        make_face()
        with BuildLine():
            Line((13.775, -6), (13.775, -13.775))
            Line((13.775, -13.775), (16.775, -13.775))
            Line((16.775, -13.775), (18.775, -13.775))
            Line((18.775, -13.775), (21.55, -13.775))
            Line((21.55, -13.775), (21.55, -11.6451706729))
            ThreePointArc((21.55, -11.6451706729), (18.2869011665, -9.2630988335), (15.9048293271, -6))
            Line((15.9048293271, -6), (13.775, -6))
        make_face()
    extrude(amount=F3_DEPTH)

    # F4 (on face) → F5 (cut)
    with BuildSketch(Plane.XY.offset(10)):
        with BuildLine():
            ThreePointArc((14.275, -5.1321900783), (13.6863115297, -5.6242615723), (13.3064625791, -4.9576258059))
            ThreePointArc((13.3064625791, -4.9576258059), (11.1089149295, -8.8448860417), (7.8128161467, -11.8574830321))
            ThreePointArc((7.8128161467, -11.8574830321), (8.3250338925, -11.8348014024), (8.587915368, -12.275))
            ThreePointArc((8.587915368, -12.275), (8.4414687586, -12.6285533906), (8.087915368, -12.775))
            Line((8.087915368, -12.775), (19.462084632, -12.775))
            ThreePointArc((19.462084632, -12.775), (18.9831490904, -12.1314007418), (19.737183786, -11.8574829878))
            ThreePointArc((19.737183786, -11.8574829878), (16.4410850319, -8.8448859932), (14.2435374058, -4.9576257653))
            ThreePointArc((14.2435374058, -4.9576257653), (14.2670714902, -5.0435015867), (14.275, -5.1321900783))
        make_face()
        with BuildLine():
            ThreePointArc((8.587915368, -12.275), (8.3250338925, -11.8348014024), (7.8128161467, -11.8574830321))
            ThreePointArc((7.8128161467, -11.8574830321), (7.6089798379, -12.4185992968), (8.087915368, -12.775))
            ThreePointArc((8.087915368, -12.775), (8.4414687586, -12.6285533906), (8.587915368, -12.275))
        make_face()
        with BuildLine():
            ThreePointArc((19.962084632, -12.275), (19.9022832105, -12.03788144), (19.737183786, -11.8574829878))
            ThreePointArc((19.737183786, -11.8574829878), (18.9831490904, -12.1314007418), (19.462084632, -12.775))
            ThreePointArc((19.462084632, -12.775), (19.8156380226, -12.6285533906), (19.962084632, -12.275))
        make_face()
        with BuildLine():
            ThreePointArc((14.275, 5.1321900783), (13.6863115269, 5.6242615719), (13.306462581, 4.9576258007))
            ThreePointArc((13.306462581, 4.9576258007), (13.7749999905, 4.6321900783), (14.2435374124, 4.957625783))
            ThreePointArc((14.2435374124, 4.957625783), (14.2670714919, 5.0435015959), (14.275, 5.1321900783))
        make_face()
        with BuildLine():
            ThreePointArc((9.1112733402, 10.8914965969), (11.2595338629, 8.6523347826), (12.8701204346, 6))
            Line((12.8701204346, 6), (14.6798795654, 6))
            ThreePointArc((14.6798795654, 6), (16.2904661313, 8.6523347751), (18.4387266452, 10.8914965847))
            ThreePointArc((18.4387266452, 10.8914965847), (17.6479328663, 11.1043420199), (18.1179071781, 11.775))
            Line((18.1179071781, 11.775), (9.4320928219, 11.775))
            ThreePointArc((9.4320928219, 11.775), (9.7856462124, 11.6285533906), (9.9320928219, 11.275))
            ThreePointArc((9.9320928219, 11.275), (9.6437414211, 10.8220045581), (9.1112733402, 10.8914965969))
        make_face()
        with BuildLine():
            ThreePointArc((9.4320928219, 11.775), (8.9621185132, 11.445657989), (9.1112733402, 10.8914965969))
            ThreePointArc((9.1112733402, 10.8914965969), (9.6437414211, 10.8220045581), (9.9320928219, 11.275))
            ThreePointArc((9.9320928219, 11.275), (9.7856462124, 11.6285533906), (9.4320928219, 11.775))
        make_face()
        with BuildLine():
            ThreePointArc((18.1179071781, 11.775), (17.6479328663, 11.1043420199), (18.4387266452, 10.8914965847))
            ThreePointArc((18.4387266452, 10.8914965847), (18.570902616, 11.0633513921), (18.6179071781, 11.275))
            ThreePointArc((18.6179071781, 11.275), (18.4714605687, 11.6285533906), (18.1179071781, 11.775))
        make_face()
        with BuildLine():
            ThreePointArc((12.8701204346, 6), (13.0986644581, 5.4831550602), (13.306462581, 4.9576258007))
            ThreePointArc((13.306462581, 4.9576258007), (13.6863115269, 5.6242615719), (14.275, 5.1321900783))
            ThreePointArc((14.275, 5.1321900783), (14.2670714919, 5.0435015959), (14.2435374124, 4.957625783))
            ThreePointArc((14.2435374124, 4.957625783), (14.4513355383, 5.4831550515), (14.6798795654, 6))
            Line((14.6798795654, 6), (12.8701204346, 6))
        make_face()
        with BuildLine():
            ThreePointArc((14.2435374058, -4.9576257653), (13.7749999783, -4.6321900783), (13.3064625791, -4.9576258059))
            ThreePointArc((13.3064625791, -4.9576258059), (13.6863115297, -5.6242615723), (14.275, -5.1321900783))
            ThreePointArc((14.275, -5.1321900783), (14.2670714902, -5.0435015867), (14.2435374058, -4.9576257653))
        make_face()
    extrude(amount=-F5_DEPTH, mode=Mode.SUBTRACT)


solid = f1.part
